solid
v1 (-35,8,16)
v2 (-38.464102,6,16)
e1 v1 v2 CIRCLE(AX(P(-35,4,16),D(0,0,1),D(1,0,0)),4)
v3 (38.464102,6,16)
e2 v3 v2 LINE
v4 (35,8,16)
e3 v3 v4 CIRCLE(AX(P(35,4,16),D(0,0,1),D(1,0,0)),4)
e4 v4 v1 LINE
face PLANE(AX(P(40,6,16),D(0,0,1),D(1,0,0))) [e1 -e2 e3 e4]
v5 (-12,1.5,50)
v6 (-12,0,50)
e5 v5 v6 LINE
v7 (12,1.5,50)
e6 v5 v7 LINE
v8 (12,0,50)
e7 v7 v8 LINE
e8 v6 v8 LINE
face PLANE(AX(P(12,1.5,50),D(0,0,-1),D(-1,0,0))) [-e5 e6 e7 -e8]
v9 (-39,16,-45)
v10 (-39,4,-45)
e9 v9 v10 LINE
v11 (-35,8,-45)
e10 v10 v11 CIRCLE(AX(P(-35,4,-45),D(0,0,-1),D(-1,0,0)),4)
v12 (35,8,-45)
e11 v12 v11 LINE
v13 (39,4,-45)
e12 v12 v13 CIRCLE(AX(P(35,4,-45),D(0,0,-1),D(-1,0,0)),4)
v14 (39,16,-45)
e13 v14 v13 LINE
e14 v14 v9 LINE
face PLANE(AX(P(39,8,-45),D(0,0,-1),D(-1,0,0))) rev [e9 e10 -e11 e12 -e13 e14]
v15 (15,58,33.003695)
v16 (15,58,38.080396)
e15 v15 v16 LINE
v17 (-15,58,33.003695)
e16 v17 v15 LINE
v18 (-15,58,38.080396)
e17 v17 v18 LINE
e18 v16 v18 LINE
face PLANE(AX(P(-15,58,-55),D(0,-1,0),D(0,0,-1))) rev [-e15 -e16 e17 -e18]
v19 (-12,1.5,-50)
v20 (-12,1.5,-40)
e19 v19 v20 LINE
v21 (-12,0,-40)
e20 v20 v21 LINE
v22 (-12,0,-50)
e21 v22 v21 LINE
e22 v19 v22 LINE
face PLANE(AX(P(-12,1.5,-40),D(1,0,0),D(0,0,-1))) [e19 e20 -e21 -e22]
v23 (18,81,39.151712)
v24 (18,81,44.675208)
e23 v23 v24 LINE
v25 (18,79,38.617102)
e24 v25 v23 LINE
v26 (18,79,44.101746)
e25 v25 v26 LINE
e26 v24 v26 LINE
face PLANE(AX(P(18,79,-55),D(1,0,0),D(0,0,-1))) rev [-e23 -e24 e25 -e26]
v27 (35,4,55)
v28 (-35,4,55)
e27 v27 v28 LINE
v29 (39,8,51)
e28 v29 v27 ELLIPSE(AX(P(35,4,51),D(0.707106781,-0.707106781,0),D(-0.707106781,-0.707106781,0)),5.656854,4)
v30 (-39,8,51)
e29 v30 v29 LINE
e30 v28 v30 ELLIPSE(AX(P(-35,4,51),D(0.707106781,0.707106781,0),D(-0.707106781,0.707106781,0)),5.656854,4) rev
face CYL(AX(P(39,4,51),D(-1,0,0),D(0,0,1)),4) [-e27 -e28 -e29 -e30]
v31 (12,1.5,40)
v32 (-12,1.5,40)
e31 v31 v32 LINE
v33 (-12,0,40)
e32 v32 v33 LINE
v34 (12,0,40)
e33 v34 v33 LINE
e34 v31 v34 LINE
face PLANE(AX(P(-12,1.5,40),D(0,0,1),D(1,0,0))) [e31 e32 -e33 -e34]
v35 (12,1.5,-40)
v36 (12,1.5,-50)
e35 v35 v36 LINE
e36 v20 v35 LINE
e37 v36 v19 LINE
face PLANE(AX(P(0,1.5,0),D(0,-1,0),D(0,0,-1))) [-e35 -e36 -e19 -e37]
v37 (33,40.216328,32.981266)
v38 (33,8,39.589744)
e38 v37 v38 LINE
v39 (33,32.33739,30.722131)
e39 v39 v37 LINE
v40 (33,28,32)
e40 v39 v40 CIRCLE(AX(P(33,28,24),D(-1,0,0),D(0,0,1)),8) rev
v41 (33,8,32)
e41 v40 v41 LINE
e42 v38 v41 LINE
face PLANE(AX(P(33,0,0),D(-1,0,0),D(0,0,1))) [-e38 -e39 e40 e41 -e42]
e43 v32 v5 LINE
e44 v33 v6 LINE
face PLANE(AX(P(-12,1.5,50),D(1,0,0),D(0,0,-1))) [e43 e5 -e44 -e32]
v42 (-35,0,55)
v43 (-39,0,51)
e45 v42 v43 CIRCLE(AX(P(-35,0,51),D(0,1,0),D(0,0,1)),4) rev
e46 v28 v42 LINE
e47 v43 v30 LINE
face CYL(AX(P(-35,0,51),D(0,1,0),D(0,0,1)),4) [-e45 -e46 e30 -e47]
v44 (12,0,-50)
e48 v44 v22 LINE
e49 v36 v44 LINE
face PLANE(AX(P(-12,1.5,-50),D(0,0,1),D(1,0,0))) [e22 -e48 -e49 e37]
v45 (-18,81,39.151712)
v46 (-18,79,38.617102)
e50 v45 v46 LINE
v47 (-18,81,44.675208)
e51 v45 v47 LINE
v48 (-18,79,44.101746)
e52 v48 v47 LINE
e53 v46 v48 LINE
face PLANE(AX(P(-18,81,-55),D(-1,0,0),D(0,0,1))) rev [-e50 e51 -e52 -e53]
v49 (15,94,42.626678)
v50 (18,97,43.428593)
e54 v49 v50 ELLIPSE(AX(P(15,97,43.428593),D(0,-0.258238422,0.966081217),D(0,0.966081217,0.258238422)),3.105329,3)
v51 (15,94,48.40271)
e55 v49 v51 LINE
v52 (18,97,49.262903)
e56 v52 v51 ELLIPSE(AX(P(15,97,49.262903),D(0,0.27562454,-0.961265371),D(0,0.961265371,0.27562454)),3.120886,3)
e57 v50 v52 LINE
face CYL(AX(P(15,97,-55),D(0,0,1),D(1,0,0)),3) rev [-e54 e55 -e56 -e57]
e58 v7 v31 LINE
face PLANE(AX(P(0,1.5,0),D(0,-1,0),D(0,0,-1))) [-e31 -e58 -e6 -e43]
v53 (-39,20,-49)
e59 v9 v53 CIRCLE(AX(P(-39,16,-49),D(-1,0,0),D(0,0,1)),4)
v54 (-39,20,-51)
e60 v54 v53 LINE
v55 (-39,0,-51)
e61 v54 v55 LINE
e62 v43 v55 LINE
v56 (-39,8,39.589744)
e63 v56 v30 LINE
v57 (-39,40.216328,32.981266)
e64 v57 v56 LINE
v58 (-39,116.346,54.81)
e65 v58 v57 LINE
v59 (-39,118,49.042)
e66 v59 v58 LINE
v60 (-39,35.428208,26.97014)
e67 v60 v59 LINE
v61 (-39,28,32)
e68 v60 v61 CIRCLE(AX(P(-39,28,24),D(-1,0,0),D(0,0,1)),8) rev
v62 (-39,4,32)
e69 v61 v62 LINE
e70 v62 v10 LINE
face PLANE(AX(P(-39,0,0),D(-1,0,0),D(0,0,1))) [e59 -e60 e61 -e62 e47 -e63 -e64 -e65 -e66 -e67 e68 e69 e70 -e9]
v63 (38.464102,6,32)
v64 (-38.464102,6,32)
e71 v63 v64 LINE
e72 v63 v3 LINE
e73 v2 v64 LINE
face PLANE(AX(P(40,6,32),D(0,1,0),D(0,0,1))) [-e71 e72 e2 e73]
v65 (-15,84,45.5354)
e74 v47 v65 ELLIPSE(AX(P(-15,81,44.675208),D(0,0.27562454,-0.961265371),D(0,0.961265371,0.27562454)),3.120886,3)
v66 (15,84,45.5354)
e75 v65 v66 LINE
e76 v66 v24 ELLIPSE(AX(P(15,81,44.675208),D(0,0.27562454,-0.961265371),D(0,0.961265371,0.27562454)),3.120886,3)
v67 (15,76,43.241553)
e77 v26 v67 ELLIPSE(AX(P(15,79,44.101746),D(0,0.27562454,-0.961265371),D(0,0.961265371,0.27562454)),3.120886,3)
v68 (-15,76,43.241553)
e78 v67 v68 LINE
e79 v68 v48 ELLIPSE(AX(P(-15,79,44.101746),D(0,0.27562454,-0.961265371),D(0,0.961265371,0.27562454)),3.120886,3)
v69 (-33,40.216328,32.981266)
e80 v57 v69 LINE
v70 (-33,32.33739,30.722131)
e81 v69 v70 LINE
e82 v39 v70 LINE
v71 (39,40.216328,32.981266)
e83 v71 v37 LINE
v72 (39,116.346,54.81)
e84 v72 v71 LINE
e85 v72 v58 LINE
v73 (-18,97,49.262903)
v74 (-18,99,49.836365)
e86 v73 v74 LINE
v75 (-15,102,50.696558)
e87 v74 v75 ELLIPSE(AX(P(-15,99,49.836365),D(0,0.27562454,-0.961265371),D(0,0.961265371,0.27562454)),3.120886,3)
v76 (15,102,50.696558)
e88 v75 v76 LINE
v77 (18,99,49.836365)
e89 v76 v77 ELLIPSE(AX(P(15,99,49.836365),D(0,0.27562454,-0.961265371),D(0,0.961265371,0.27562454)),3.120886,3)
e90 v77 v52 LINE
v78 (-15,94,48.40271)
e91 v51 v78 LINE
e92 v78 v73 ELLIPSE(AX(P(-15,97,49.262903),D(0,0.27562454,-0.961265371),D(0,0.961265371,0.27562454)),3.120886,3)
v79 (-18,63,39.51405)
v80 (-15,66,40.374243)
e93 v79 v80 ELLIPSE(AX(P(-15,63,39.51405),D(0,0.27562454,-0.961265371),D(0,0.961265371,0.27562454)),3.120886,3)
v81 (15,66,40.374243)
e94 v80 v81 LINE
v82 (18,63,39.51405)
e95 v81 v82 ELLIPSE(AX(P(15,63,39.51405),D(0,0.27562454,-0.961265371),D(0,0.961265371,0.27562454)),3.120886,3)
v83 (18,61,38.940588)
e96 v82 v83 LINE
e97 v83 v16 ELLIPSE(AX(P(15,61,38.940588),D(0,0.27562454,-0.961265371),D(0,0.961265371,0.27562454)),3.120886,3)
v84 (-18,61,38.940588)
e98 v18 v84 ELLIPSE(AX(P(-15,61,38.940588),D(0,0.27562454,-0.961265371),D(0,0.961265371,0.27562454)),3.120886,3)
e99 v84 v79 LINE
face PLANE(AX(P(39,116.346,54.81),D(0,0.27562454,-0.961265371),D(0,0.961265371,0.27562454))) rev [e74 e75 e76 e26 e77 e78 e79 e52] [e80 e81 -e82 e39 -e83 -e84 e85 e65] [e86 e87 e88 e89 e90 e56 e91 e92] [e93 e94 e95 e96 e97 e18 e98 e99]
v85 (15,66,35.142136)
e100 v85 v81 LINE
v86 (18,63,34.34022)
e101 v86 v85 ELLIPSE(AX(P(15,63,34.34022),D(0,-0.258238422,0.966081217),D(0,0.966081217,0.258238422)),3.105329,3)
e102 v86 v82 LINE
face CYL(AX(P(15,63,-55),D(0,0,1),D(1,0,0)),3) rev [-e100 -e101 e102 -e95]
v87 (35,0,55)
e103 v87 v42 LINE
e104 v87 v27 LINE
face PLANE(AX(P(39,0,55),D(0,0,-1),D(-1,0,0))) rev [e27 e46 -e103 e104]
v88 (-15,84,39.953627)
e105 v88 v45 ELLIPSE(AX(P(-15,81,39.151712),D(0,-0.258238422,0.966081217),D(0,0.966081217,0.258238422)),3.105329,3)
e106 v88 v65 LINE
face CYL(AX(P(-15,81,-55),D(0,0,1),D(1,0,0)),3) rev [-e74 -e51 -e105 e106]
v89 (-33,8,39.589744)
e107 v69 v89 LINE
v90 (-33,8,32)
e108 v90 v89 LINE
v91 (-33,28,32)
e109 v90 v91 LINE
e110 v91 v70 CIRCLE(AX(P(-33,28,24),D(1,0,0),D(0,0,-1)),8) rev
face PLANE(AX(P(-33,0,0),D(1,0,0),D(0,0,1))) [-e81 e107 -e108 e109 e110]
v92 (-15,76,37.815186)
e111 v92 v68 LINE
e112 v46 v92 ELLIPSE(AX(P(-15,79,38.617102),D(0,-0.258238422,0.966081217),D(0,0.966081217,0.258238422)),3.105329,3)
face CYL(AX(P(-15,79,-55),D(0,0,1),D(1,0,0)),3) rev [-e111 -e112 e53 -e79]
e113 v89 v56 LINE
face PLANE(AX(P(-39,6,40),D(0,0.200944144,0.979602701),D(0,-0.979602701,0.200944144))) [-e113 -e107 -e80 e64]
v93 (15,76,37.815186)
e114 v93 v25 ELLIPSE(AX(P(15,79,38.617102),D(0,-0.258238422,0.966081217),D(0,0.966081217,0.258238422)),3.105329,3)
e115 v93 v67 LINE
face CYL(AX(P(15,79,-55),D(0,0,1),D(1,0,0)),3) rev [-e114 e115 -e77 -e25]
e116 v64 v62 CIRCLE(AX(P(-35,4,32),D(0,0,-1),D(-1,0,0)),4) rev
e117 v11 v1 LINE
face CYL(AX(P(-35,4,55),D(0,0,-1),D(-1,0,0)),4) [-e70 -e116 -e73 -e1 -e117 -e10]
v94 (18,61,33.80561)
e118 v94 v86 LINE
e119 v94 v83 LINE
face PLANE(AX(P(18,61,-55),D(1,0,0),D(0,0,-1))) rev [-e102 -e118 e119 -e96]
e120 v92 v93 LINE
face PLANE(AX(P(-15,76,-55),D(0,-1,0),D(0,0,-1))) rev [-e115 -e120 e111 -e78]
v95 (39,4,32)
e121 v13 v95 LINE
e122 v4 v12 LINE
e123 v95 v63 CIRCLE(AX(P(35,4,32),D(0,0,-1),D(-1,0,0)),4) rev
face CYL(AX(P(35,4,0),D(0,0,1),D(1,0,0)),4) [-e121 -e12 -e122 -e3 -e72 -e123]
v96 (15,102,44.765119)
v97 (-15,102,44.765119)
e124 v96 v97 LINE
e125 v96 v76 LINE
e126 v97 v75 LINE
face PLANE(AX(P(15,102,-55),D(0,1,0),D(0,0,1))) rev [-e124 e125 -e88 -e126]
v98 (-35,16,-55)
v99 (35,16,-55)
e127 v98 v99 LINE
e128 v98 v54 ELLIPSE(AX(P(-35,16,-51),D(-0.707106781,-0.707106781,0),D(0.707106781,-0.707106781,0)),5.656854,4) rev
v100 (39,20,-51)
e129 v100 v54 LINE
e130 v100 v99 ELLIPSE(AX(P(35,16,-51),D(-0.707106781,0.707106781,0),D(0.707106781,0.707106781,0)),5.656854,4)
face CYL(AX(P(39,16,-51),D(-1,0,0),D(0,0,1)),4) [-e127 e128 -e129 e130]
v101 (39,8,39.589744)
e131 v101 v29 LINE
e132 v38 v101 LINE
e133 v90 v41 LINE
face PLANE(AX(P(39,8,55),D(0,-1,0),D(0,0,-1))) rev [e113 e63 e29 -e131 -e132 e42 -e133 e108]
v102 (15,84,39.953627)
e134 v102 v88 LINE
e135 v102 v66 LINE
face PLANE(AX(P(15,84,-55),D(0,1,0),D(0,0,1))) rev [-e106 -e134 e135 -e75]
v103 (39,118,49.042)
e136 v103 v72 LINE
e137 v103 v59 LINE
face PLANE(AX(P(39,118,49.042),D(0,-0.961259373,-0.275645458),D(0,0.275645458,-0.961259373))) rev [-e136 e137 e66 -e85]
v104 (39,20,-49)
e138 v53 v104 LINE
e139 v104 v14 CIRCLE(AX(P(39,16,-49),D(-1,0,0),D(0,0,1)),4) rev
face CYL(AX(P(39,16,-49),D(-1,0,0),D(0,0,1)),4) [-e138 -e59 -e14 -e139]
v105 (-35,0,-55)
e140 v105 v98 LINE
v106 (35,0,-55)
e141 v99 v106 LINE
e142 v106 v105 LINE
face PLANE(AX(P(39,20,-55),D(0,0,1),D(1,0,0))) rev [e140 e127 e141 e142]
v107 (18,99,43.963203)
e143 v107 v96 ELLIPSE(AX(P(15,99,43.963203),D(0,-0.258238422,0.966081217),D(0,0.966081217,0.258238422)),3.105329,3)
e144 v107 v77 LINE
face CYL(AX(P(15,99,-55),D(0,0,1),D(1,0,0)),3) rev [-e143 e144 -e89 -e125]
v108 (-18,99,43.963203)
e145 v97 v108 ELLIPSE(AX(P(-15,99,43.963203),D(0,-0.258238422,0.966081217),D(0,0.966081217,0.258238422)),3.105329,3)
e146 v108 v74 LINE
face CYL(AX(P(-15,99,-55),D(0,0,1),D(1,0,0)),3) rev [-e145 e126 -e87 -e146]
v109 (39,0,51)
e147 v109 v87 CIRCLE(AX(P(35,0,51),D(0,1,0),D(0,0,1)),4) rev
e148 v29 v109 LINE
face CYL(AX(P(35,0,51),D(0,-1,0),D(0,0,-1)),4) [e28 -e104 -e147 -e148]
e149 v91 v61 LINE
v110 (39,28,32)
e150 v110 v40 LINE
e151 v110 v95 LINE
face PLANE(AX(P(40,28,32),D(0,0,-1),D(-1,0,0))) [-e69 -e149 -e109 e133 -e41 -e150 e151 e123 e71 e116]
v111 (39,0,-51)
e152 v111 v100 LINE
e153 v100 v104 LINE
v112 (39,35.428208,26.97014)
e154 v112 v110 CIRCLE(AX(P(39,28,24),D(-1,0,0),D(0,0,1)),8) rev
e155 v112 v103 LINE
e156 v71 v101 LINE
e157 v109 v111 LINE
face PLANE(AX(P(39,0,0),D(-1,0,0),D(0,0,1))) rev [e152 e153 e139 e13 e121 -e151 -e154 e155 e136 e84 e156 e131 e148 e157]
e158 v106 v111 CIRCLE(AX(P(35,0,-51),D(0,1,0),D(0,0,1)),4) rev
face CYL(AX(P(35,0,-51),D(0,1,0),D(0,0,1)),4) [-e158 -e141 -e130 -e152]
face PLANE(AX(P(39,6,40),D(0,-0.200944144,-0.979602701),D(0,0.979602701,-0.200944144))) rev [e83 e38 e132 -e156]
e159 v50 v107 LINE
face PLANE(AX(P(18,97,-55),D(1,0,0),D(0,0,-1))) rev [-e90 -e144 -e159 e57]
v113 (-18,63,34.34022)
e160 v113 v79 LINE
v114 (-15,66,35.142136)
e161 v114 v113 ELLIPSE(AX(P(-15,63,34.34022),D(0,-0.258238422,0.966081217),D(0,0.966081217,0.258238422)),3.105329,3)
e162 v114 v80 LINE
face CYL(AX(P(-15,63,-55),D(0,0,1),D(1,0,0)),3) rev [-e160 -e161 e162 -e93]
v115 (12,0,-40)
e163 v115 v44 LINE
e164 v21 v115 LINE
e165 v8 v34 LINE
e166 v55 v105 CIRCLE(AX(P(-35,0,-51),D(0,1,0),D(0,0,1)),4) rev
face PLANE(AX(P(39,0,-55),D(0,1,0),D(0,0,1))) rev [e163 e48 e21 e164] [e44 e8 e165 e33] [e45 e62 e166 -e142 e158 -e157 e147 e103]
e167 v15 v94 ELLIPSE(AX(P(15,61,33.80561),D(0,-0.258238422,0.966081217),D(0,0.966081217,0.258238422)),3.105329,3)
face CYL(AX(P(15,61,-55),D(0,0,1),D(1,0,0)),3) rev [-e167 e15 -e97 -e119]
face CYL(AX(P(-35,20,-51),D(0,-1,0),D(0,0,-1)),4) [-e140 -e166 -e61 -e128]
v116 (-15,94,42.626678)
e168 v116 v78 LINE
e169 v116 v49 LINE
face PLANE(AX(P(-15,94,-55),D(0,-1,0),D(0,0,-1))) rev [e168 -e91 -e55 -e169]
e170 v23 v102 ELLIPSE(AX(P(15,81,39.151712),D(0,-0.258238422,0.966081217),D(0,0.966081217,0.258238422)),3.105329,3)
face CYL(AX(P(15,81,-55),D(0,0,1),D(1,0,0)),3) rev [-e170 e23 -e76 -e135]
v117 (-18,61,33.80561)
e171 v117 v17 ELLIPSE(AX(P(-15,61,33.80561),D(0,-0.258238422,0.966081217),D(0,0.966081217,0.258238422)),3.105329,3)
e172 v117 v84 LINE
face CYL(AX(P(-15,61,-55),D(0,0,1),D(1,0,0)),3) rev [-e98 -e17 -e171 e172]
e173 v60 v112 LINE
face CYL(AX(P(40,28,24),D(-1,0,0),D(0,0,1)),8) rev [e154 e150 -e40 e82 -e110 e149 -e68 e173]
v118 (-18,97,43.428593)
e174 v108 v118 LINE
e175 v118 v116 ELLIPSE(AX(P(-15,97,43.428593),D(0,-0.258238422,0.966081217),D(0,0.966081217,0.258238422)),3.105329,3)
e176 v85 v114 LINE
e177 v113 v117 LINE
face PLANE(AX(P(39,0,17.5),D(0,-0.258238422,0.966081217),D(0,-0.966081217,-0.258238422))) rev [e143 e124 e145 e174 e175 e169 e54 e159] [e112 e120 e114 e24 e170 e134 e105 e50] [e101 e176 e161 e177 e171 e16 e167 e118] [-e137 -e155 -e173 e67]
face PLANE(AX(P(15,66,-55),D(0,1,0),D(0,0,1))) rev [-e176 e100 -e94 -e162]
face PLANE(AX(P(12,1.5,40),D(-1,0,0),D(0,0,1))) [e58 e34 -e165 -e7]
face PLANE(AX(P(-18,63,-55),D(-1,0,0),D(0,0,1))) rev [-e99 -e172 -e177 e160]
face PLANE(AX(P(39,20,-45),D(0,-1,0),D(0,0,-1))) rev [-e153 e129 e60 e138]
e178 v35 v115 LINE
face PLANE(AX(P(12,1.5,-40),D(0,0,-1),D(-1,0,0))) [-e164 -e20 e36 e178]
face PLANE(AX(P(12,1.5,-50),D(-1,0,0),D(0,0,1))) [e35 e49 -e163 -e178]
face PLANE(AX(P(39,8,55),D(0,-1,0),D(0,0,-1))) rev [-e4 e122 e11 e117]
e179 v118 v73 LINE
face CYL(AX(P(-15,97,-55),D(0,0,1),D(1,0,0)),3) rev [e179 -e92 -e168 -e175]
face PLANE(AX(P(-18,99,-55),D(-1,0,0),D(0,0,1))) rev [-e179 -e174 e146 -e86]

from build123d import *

# Parameters (mm, degrees)
EXTRUDE_1_DEPTH     = 78
EXTRUDE_2_DEPTH     = 78
EXTRUDE_4_DEPTH     = 6
CUT_EXTRUDE_3_DEPTH = 80
CUT_EXTRUDE_4_DEPTH = 160.514889587
CUT_EXTRUDE_5_DEPTH = 170.32217811
SKETCH_10_W         = 24
SKETCH_10_H         = 10
CUT_EXTRUDE_6_DEPTH = 1.5
FILLET_1_R          = 4
FILLET_START        = -45
FILLET_6_DEPTH      = 77
FILLET_START_2      = -39
FILLET_6_2_DEPTH    = 78


with BuildPart() as part:
    # 草图1 → 凸台-拉伸1 (new body)
    with BuildSketch(Plane(origin=(-39, 0, 0), x_dir=(0, 0, -1), z_dir=(1, 0, 0))):
        Polygon((55, 0), (-55, 0), (-55, 8), (45, 8), (45, 20), (55, 20), align=None)
    extrude(amount=EXTRUDE_1_DEPTH)

    # 草图2 → 凸台-拉伸2 (add)
    with BuildSketch(Plane(origin=(-39, 0, 0), x_dir=(0, 0, -1), z_dir=(1, 0, 0))):
        Polygon((-17.5, 0), (-49.042, 118), (-54.81, 116.346), (-21.45, 0), align=None)
    extrude(amount=EXTRUDE_2_DEPTH)

    # 草图4 → 凸台-拉伸4 (add)
    with BuildSketch(Plane(origin=(33, 0, 0), x_dir=(0, 0, -1), z_dir=(1, 0, 0))):
        Polygon((-20, 6), (-40, 6), (-32, 45), align=None)
    extrude_4 = extrude(amount=EXTRUDE_4_DEPTH)

    # 镜向1: 凸台-拉伸4 across plane
    add(extrude_4.mirror(Plane(origin=(0, 0, 0), x_dir=(0, 0, 1), z_dir=(1, 0, 0))))

    # 草图7 → 切除-拉伸3 (cut)
    with BuildSketch(Plane(origin=(-40, 0, 0), x_dir=(0, 0, -1), z_dir=(1, 0, 0))):
        with BuildLine():
            Line((-16, 6), (-16, 28))
            ThreePointArc((-16, 28), (-24, 36), (-32, 28))
            Line((-32, 28), (-32, 6))
            Line((-32, 6), (-16, 6))
        make_face()
    extrude(amount=CUT_EXTRUDE_3_DEPTH, mode=Mode.SUBTRACT)

    # 草图8 → 切除-拉伸4 (cut, through all)
    with BuildSketch(Plane.XY.offset(45)):
        with BuildLine():
            Line((-15, 58), (15, 58))
            ThreePointArc((15, 58), (17.121320344, 58.878679656), (18, 61))
            Line((18, 61), (18, 63))
            ThreePointArc((18, 63), (17.121320344, 65.121320344), (15, 66))
            Line((15, 66), (-15, 66))
            ThreePointArc((-15, 66), (-17.121320344, 65.121320344), (-18, 63))
            Line((-18, 63), (-18, 61))
            ThreePointArc((-18, 61), (-17.121320344, 58.878679656), (-15, 58))
        make_face()
        with BuildLine():
            Line((-15, 76), (15, 76))
            ThreePointArc((15, 76), (17.121320344, 76.878679656), (18, 79))
            Line((18, 79), (18, 81))
            ThreePointArc((18, 81), (17.121320344, 83.121320344), (15, 84))
            Line((15, 84), (-15, 84))
            ThreePointArc((-15, 84), (-17.121320344, 83.121320344), (-18, 81))
            Line((-18, 81), (-18, 79))
            ThreePointArc((-18, 79), (-17.121320344, 76.878679656), (-15, 76))
        make_face()
        with BuildLine():
            Line((-15, 94), (15, 94))
            ThreePointArc((15, 94), (17.121320344, 94.878679656), (18, 97))
            Line((18, 97), (18, 99))
            ThreePointArc((18, 99), (17.121320344, 101.121320344), (15, 102))
            Line((15, 102), (-15, 102))
            ThreePointArc((-15, 102), (-17.121320344, 101.121320344), (-18, 99))
            Line((-18, 99), (-18, 97))
            ThreePointArc((-18, 97), (-17.121320344, 94.878679656), (-15, 94))
        make_face()
    extrude(amount=-CUT_EXTRUDE_4_DEPTH, mode=Mode.SUBTRACT)

    # 草图9 → 切除-拉伸5 (cut, through all)
    with BuildSketch(Plane.XY.offset(60)):
        with BuildLine():
            Line((-15, 58), (15, 58))
            ThreePointArc((15, 58), (17.121320344, 58.878679656), (18, 61))
            Line((18, 61), (18, 63))
            ThreePointArc((18, 63), (17.121320344, 65.121320344), (15, 66))
            Line((15, 66), (-15, 66))
            ThreePointArc((-15, 66), (-17.121320344, 65.121320344), (-18, 63))
            Line((-18, 63), (-18, 61))
            ThreePointArc((-18, 61), (-17.121320344, 58.878679656), (-15, 58))
        make_face()
        with BuildLine():
            Line((-15, 76), (15, 76))
            ThreePointArc((15, 76), (17.121320344, 76.878679656), (18, 79))
            Line((18, 79), (18, 81))
            ThreePointArc((18, 81), (17.121320344, 83.121320344), (15, 84))
            Line((15, 84), (-15, 84))
            ThreePointArc((-15, 84), (-17.121320344, 83.121320344), (-18, 81))
            Line((-18, 81), (-18, 79))
            ThreePointArc((-18, 79), (-17.121320344, 76.878679656), (-15, 76))
        make_face()
        with BuildLine():
            Line((-15, 94), (15, 94))
            ThreePointArc((15, 94), (17.121320344, 94.878679656), (18, 97))
            Line((18, 97), (18, 99))
            ThreePointArc((18, 99), (17.121320344, 101.121320344), (15, 102))
            Line((15, 102), (-15, 102))
            ThreePointArc((-15, 102), (-17.121320344, 101.121320344), (-18, 99))
            Line((-18, 99), (-18, 97))
            ThreePointArc((-18, 97), (-17.121320344, 94.878679656), (-15, 94))
        make_face()
    extrude(amount=-CUT_EXTRUDE_5_DEPTH, mode=Mode.SUBTRACT)

    # 草图10 → 切除-拉伸6 (cut)
    with BuildSketch(Plane(origin=(0, 0, 0), x_dir=(1, 0, 0), z_dir=(0, 1, 0))):
        with Locations((0, 45)):
            Rectangle(SKETCH_10_W, SKETCH_10_H)
        with Locations((0, -45)):
            Rectangle(SKETCH_10_W, SKETCH_10_H)
    extrude(amount=CUT_EXTRUDE_6_DEPTH, mode=Mode.SUBTRACT)

    # 圆角1
    fillet_1_edges = [part.edges().sort_by_distance(p)[0] for p in [
        (0, 20, -45),
        (0, 20, -55),
        (39, 4, 55),
        (39, 10, -55),
        (-39, 4, 55),
        (-39, 10, -55),
    ]]
    fillet(fillet_1_edges, radius=FILLET_1_R)

    # 圆角6: read off the stored shape, not the designer's step
    # 圆角6 outline → 圆角6 (cut)
    with BuildSketch(Plane.XY.offset(FILLET_START)):
        with BuildLine():
            Line((-39, 8), (-39, 4))
            ThreePointArc((-39, 4), (-37.828427125, 6.828427125), (-35, 8))
            Line((-35, 8), (-39, 8))
        make_face()
        with BuildLine():
            Line((39, 8), (35, 8))
            ThreePointArc((35, 8), (37.828427125, 6.828427125), (39, 4))
            Line((39, 4), (39, 8))
        make_face()
    extrude(amount=FILLET_6_DEPTH, mode=Mode.SUBTRACT)

    # Fillet 6 2 outline → Fillet 6 2 (cut)
    with BuildSketch(Plane.YZ.offset(FILLET_START_2)):
        with BuildLine():
            Line((8, 55), (4, 55))
            ThreePointArc((4, 55), (6.828427125, 53.828427125), (8, 51))
            Line((8, 51), (8, 55))
        make_face()
    extrude(amount=FILLET_6_2_DEPTH, mode=Mode.SUBTRACT)


solid = part.part
